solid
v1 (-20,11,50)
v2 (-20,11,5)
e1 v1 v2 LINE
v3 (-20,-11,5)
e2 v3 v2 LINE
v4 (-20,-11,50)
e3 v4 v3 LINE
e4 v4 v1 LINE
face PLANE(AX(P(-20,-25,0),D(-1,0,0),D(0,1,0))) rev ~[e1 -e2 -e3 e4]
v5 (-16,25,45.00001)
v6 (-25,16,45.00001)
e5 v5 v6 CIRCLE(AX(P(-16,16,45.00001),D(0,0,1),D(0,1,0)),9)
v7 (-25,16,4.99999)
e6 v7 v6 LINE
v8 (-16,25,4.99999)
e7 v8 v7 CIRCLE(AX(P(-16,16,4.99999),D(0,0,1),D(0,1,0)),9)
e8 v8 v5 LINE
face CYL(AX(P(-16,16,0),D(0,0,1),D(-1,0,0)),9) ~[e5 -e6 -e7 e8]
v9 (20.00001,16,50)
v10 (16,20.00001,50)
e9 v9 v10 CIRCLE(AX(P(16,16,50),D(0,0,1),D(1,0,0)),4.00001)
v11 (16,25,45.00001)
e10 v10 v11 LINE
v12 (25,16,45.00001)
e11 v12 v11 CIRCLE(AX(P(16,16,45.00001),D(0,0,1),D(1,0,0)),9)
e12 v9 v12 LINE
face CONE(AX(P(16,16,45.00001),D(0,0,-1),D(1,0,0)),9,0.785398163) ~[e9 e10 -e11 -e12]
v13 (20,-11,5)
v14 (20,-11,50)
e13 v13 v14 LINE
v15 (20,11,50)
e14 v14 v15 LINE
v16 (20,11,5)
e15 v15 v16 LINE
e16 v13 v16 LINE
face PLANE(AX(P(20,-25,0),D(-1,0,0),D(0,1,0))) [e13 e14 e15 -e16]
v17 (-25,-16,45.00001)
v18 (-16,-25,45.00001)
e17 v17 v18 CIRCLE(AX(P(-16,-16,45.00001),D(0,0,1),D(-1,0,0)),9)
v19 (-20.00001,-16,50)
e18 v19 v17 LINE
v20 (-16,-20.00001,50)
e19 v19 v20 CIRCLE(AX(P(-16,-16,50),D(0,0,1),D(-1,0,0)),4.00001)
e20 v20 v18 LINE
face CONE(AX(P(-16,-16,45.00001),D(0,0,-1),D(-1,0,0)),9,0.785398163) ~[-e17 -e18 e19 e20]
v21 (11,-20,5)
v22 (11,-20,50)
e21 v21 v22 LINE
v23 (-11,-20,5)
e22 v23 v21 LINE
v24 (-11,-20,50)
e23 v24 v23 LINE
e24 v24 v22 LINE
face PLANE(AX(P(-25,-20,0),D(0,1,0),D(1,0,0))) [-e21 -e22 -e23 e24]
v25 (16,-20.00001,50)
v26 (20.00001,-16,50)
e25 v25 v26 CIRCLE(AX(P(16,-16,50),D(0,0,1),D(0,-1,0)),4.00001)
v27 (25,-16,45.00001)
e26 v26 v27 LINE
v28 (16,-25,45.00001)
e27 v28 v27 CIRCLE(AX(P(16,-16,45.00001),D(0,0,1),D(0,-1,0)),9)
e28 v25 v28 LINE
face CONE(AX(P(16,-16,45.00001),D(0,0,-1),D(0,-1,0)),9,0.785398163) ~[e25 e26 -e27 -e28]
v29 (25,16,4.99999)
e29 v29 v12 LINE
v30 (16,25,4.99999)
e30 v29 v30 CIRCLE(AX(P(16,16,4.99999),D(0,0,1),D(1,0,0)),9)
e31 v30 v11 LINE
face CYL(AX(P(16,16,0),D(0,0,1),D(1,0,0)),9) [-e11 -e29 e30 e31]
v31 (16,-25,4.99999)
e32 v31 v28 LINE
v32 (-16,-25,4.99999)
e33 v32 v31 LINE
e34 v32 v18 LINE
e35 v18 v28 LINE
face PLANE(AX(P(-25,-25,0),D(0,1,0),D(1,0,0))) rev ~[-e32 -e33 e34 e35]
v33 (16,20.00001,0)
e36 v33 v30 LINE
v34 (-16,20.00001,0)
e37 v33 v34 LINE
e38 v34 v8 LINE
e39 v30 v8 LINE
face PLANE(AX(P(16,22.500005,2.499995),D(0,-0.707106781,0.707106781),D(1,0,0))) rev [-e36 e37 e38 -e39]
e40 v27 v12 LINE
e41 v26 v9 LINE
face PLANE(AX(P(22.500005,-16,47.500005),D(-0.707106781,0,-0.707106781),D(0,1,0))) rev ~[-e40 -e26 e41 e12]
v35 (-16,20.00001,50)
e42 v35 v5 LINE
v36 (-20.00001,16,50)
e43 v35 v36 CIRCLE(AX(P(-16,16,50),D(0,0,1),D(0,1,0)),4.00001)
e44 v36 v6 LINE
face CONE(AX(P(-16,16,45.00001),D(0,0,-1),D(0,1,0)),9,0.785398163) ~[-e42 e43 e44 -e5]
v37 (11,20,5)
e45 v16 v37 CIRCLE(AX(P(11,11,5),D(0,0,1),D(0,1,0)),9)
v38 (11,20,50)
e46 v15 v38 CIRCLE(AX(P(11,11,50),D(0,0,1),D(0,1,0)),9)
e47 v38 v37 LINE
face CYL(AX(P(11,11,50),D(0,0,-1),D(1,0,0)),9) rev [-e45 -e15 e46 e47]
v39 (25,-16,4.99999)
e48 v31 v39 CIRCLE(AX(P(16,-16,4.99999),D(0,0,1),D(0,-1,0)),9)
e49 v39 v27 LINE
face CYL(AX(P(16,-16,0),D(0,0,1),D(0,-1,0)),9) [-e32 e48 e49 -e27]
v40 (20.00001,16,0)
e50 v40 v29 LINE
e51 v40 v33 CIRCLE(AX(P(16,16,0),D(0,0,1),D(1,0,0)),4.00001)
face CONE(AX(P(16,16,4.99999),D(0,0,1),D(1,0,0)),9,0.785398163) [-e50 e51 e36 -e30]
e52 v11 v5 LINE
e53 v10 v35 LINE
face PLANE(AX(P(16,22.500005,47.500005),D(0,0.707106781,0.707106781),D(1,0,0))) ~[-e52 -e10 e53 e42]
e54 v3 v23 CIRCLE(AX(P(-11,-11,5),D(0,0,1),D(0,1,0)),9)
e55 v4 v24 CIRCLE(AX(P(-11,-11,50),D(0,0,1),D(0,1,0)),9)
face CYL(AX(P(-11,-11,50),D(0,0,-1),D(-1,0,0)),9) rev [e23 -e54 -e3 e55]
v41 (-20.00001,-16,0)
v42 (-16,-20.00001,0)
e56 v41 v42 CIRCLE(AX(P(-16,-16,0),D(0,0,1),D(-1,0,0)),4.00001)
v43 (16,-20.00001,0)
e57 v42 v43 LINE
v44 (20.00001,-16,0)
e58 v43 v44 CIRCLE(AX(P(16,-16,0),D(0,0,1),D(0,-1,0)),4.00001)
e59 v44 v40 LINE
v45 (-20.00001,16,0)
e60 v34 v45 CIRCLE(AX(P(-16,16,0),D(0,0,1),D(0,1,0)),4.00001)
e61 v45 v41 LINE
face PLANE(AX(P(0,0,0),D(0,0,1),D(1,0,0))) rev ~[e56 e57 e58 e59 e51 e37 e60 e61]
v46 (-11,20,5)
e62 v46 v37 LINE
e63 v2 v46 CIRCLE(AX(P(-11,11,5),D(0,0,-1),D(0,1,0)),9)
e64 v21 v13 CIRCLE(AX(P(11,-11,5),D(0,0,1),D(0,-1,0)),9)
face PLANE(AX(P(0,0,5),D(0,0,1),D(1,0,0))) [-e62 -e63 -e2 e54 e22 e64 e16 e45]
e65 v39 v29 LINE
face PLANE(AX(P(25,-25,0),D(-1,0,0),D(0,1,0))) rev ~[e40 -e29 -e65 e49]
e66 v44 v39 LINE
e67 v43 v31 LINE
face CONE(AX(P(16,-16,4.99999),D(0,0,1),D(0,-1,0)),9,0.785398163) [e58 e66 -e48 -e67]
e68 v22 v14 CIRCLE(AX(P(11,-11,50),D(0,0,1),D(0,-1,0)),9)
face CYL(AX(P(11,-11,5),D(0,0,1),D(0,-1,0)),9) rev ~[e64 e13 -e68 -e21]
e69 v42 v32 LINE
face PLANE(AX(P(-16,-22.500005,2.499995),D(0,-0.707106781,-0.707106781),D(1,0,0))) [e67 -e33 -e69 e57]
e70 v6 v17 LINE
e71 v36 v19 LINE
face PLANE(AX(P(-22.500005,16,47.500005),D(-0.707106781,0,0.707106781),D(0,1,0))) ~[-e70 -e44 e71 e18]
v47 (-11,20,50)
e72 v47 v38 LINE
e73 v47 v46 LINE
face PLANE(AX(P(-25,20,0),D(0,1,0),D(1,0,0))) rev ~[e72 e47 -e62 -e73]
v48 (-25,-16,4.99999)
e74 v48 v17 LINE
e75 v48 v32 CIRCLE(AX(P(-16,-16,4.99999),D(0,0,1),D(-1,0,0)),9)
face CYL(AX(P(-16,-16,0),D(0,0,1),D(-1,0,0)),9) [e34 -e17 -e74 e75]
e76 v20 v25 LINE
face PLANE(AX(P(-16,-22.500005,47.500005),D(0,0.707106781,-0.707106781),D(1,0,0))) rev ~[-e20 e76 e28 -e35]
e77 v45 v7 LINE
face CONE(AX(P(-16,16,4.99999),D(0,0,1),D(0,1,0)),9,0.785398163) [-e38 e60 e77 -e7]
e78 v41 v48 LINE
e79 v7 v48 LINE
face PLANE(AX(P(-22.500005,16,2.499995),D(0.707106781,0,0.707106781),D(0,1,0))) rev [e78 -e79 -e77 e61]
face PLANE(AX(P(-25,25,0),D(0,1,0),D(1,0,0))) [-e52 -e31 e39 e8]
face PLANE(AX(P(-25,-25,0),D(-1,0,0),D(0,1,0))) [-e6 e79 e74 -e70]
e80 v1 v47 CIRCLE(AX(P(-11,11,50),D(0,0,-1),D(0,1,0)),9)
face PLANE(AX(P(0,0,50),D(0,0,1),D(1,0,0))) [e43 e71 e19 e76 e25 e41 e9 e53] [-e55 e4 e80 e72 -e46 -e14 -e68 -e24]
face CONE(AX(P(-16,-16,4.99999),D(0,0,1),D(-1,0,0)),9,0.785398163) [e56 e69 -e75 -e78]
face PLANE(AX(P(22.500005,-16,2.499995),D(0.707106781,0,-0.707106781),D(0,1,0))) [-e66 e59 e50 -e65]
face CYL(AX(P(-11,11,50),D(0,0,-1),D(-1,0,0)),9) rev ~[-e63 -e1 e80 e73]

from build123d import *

# Parameters (mm, degrees)
F0_W     = 50
F0_H     = 50
F1_DEPTH = 50
F2_T     = -5
F3_R     = 9
F4_SIZE  = 4.99999


# Not quite as in the source:
# - a fillet or chamfer is up to 0.001 mm smaller than in the source, because OpenCascade refuses the exact size


with BuildPart() as f1:
    # F0 (on Top) → F1 (new body)
    with BuildSketch(Plane.XY):
        Rectangle(F0_W, F0_H)
    extrude(amount=F1_DEPTH)

    # F2
    f2_openings = [f1.faces().sort_by_distance(p)[0] for p in [
        (0, 0, 50),
    ]]
    offset(amount=F2_T, openings=f2_openings)

    # F3
    f3_edges = [f1.edges().sort_by_distance(p)[0] for p in [
        (-25, 25, 25),
        (-25, -25, 25),
        (25, -25, 25),
        (25, 25, 25),
        (20, -20, 27.5),
        (-20, -20, 27.5),
        (-20, 20, 27.5),
        (20, 20, 27.5),
    ]]
    fillet(f3_edges, radius=F3_R)

    # F4 (size 5 in the source; OpenCascade refuses exactly that, so slightly less here)
    f4_edges = [f1.edges().sort_by_distance(p)[0] for p in [
        (25, 0, 0),
        (25, -16, 25),
        (25, 16, 25),
        (25, 0, 50),
        (0, 25, 0),
        (16, 25, 25),
        (-16, 25, 25),
        (0, 25, 50),
        (-25, 0, 0),
        (-25, 16, 25),
        (-25, -16, 25),
        (-25, 0, 50),
        (0, -25, 0),
        (-16, -25, 25),
        (16, -25, 25),
        (0, -25, 50),
    ]]
    chamfer(f4_edges, length=F4_SIZE)


solid = f1.part
